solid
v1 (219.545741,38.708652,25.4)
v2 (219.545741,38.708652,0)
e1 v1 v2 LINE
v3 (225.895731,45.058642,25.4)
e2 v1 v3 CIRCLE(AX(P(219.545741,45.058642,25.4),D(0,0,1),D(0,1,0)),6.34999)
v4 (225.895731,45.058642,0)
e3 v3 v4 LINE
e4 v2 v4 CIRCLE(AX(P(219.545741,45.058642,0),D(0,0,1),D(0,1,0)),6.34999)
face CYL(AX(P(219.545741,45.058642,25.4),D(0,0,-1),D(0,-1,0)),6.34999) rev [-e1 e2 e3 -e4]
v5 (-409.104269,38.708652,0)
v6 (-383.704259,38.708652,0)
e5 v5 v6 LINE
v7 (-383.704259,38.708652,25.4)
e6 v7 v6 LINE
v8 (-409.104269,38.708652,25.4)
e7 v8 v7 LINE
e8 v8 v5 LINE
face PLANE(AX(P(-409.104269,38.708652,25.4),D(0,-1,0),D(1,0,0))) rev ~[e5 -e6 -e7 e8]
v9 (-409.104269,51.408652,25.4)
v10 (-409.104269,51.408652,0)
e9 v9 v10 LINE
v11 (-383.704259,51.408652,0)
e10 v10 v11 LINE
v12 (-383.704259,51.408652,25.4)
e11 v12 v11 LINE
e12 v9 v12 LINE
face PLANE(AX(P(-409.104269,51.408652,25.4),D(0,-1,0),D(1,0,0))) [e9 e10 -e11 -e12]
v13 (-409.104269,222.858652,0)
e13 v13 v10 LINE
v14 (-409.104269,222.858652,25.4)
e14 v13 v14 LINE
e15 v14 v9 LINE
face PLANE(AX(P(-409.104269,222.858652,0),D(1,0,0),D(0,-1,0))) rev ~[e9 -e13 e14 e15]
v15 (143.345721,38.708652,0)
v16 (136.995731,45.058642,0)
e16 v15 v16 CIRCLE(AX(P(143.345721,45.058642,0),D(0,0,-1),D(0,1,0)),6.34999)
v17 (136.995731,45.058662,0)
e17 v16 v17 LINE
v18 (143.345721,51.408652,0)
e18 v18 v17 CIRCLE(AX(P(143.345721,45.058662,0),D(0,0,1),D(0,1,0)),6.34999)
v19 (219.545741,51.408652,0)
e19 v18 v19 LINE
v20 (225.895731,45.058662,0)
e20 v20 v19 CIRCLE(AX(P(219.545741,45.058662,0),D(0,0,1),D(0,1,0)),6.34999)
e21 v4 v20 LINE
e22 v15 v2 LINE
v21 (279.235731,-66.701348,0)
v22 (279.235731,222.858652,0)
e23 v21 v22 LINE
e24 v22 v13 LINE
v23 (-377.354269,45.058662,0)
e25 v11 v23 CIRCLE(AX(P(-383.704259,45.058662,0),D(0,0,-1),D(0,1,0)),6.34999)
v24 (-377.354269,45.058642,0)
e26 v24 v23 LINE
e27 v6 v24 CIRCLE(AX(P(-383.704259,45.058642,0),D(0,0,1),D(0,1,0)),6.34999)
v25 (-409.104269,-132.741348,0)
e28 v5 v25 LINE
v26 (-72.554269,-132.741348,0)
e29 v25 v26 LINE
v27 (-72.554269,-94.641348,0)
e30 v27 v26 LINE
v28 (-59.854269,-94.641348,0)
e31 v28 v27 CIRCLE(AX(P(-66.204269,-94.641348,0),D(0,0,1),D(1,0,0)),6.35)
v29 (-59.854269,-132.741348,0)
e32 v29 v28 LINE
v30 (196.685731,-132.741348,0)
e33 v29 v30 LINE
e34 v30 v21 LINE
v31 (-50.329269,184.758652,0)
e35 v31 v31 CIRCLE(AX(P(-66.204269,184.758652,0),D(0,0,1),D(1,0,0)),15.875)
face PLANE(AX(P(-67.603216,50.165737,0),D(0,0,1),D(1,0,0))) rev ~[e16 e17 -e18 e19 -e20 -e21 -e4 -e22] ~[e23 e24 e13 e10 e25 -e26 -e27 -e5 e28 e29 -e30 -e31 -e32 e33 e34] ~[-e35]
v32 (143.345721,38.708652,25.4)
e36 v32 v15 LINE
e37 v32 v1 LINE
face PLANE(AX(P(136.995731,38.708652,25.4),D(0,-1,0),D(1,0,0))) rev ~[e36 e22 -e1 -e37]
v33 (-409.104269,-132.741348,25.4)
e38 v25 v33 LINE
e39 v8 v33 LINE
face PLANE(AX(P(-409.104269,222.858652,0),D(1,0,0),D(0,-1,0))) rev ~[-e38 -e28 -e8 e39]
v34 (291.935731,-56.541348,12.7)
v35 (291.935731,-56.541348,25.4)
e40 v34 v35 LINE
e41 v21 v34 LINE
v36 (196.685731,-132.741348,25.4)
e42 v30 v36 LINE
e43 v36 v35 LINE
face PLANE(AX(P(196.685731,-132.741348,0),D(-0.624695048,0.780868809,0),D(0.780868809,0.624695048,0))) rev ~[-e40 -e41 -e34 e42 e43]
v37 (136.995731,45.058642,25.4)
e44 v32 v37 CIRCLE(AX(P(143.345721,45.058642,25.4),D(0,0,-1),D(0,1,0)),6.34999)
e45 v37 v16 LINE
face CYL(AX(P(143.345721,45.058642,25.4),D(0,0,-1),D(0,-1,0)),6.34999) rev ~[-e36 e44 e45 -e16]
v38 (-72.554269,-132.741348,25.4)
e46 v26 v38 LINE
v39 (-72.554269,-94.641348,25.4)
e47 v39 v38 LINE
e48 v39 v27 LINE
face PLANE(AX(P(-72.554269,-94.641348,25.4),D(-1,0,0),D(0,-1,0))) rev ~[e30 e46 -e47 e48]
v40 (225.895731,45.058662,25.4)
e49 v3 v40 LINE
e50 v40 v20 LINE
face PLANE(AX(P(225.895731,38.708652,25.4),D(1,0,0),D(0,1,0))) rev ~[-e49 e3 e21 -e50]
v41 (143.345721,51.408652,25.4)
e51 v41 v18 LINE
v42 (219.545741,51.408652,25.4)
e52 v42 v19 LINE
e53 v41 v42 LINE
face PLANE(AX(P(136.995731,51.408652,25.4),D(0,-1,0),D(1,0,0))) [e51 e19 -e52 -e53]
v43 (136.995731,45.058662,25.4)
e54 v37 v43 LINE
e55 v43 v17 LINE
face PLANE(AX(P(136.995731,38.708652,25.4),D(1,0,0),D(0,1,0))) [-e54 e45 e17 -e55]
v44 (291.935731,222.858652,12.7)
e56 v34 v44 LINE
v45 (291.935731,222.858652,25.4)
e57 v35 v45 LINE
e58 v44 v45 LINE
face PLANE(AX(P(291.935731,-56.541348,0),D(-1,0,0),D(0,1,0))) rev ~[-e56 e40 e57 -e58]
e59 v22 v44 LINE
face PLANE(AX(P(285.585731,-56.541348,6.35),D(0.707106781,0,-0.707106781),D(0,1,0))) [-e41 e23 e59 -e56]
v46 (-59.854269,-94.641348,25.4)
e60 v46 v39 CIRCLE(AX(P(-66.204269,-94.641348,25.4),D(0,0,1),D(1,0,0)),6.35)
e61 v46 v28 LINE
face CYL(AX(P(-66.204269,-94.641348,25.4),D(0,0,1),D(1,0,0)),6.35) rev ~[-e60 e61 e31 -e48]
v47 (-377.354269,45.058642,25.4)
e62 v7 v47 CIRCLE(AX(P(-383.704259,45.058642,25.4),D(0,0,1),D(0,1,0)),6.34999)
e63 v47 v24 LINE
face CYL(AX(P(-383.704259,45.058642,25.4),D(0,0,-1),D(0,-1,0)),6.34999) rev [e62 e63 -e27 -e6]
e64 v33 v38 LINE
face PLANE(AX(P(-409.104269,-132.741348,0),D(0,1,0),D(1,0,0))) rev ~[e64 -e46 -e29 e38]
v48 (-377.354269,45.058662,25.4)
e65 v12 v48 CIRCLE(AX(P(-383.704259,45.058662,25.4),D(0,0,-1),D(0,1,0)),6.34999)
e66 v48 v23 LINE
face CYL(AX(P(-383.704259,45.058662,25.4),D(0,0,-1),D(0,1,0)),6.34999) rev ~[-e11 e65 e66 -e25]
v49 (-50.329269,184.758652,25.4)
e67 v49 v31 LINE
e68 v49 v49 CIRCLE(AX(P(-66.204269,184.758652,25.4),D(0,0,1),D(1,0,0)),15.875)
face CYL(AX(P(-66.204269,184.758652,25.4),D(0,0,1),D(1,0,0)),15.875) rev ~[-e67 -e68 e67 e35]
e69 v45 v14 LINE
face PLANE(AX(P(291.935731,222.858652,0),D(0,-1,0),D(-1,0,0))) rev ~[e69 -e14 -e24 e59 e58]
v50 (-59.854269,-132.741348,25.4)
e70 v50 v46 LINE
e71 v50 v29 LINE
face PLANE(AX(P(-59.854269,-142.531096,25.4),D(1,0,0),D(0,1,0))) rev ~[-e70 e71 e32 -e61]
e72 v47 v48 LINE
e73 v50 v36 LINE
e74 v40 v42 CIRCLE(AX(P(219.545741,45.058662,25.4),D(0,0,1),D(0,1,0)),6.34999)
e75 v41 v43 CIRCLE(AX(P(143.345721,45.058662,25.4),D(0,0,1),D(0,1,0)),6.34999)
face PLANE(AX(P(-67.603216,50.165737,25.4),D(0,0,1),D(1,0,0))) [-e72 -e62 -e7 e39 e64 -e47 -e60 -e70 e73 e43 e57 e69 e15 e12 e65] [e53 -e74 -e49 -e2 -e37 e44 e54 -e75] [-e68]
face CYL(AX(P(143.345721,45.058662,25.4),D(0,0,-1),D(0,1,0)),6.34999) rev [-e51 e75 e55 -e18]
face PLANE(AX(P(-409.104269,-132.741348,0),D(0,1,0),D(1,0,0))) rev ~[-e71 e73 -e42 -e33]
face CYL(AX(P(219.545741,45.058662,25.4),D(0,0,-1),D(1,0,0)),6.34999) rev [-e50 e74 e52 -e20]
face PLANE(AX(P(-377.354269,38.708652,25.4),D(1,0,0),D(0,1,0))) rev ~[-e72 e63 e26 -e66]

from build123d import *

# Parameters (mm, degrees)
F1_DEPTH = 25.4
F2_W     = 31.75
F2_H     = 12.7
F2_W_2   = 88.9
F2_R     = 15.875
F3_DEPTH = 25.401
F4_R     = 6.34999
F5_SIZE  = 12.7


# Not quite as in the source:
# - a fillet or chamfer is up to 0.001 mm smaller than in the source, because OpenCascade refuses the exact size


with BuildPart() as f1:
    # F0 (on Top) → F1 (new body)
    with BuildSketch(Plane.XY):
        Polygon((-50.9642694569, 222.8586515407), (-409.1042694569, 222.8586515407), (-409.1042694569, 57.7525011744), (-409.1042694569, 32.4011304667), (-409.1042694569, -132.7413484593), (196.6857305431, -132.7413484593), (291.9357305431, -56.5413484593), (291.9357305431, 222.8586515407), (-49.417052418, 222.8586515407), align=None)
    extrude(amount=F1_DEPTH)

    # F2 (on face) → F3 (cut, through all)
    with BuildSketch(Plane.XY.offset(25.4)):
        with Locations((-393.2292694569, 45.0586515407)):
            Rectangle(F2_W, F2_H)
        with Locations((181.4457305431, 45.0586515407)):
            Rectangle(F2_W_2, F2_H)
        with BuildLine():
            Line((-59.8542694569, -142.5310963776), (-59.8542694569, -94.6413484593))
            ThreePointArc((-59.8542694569, -94.6413484593), (-66.2042694569, -88.2913484593), (-72.5542694569, -94.6413484593))
            Line((-72.5542694569, -94.6413484593), (-72.5542694569, -137.446552515))
            Line((-72.5542694569, -137.446552515), (-59.8542694569, -142.5310963776))
        make_face()
        with Locations((-66.2042694569, 184.7586515407)):
            Circle(F2_R)
    extrude(amount=-F3_DEPTH, mode=Mode.SUBTRACT)

    # F4 (radius 6.35 in the source; OpenCascade refuses exactly that, so slightly less here)
    f4_edges = [f1.edges().sort_by_distance(p)[0] for p in [
        (-377.354269, 51.408652, 12.7),
        (225.895731, 51.408652, 12.7),
        (225.895731, 38.708652, 12.7),
        (-377.354269, 38.708652, 12.7),
        (136.995731, 51.408652, 12.7),
        (136.995731, 38.708652, 12.7),
    ]]
    fillet(f4_edges, radius=F4_R)

    # F5
    f5_edges = [f1.edges().sort_by_distance(p)[0] for p in [
        (291.935731, 83.158652, 0),
    ]]
    chamfer(f5_edges, length=F5_SIZE)


solid = f1.part
